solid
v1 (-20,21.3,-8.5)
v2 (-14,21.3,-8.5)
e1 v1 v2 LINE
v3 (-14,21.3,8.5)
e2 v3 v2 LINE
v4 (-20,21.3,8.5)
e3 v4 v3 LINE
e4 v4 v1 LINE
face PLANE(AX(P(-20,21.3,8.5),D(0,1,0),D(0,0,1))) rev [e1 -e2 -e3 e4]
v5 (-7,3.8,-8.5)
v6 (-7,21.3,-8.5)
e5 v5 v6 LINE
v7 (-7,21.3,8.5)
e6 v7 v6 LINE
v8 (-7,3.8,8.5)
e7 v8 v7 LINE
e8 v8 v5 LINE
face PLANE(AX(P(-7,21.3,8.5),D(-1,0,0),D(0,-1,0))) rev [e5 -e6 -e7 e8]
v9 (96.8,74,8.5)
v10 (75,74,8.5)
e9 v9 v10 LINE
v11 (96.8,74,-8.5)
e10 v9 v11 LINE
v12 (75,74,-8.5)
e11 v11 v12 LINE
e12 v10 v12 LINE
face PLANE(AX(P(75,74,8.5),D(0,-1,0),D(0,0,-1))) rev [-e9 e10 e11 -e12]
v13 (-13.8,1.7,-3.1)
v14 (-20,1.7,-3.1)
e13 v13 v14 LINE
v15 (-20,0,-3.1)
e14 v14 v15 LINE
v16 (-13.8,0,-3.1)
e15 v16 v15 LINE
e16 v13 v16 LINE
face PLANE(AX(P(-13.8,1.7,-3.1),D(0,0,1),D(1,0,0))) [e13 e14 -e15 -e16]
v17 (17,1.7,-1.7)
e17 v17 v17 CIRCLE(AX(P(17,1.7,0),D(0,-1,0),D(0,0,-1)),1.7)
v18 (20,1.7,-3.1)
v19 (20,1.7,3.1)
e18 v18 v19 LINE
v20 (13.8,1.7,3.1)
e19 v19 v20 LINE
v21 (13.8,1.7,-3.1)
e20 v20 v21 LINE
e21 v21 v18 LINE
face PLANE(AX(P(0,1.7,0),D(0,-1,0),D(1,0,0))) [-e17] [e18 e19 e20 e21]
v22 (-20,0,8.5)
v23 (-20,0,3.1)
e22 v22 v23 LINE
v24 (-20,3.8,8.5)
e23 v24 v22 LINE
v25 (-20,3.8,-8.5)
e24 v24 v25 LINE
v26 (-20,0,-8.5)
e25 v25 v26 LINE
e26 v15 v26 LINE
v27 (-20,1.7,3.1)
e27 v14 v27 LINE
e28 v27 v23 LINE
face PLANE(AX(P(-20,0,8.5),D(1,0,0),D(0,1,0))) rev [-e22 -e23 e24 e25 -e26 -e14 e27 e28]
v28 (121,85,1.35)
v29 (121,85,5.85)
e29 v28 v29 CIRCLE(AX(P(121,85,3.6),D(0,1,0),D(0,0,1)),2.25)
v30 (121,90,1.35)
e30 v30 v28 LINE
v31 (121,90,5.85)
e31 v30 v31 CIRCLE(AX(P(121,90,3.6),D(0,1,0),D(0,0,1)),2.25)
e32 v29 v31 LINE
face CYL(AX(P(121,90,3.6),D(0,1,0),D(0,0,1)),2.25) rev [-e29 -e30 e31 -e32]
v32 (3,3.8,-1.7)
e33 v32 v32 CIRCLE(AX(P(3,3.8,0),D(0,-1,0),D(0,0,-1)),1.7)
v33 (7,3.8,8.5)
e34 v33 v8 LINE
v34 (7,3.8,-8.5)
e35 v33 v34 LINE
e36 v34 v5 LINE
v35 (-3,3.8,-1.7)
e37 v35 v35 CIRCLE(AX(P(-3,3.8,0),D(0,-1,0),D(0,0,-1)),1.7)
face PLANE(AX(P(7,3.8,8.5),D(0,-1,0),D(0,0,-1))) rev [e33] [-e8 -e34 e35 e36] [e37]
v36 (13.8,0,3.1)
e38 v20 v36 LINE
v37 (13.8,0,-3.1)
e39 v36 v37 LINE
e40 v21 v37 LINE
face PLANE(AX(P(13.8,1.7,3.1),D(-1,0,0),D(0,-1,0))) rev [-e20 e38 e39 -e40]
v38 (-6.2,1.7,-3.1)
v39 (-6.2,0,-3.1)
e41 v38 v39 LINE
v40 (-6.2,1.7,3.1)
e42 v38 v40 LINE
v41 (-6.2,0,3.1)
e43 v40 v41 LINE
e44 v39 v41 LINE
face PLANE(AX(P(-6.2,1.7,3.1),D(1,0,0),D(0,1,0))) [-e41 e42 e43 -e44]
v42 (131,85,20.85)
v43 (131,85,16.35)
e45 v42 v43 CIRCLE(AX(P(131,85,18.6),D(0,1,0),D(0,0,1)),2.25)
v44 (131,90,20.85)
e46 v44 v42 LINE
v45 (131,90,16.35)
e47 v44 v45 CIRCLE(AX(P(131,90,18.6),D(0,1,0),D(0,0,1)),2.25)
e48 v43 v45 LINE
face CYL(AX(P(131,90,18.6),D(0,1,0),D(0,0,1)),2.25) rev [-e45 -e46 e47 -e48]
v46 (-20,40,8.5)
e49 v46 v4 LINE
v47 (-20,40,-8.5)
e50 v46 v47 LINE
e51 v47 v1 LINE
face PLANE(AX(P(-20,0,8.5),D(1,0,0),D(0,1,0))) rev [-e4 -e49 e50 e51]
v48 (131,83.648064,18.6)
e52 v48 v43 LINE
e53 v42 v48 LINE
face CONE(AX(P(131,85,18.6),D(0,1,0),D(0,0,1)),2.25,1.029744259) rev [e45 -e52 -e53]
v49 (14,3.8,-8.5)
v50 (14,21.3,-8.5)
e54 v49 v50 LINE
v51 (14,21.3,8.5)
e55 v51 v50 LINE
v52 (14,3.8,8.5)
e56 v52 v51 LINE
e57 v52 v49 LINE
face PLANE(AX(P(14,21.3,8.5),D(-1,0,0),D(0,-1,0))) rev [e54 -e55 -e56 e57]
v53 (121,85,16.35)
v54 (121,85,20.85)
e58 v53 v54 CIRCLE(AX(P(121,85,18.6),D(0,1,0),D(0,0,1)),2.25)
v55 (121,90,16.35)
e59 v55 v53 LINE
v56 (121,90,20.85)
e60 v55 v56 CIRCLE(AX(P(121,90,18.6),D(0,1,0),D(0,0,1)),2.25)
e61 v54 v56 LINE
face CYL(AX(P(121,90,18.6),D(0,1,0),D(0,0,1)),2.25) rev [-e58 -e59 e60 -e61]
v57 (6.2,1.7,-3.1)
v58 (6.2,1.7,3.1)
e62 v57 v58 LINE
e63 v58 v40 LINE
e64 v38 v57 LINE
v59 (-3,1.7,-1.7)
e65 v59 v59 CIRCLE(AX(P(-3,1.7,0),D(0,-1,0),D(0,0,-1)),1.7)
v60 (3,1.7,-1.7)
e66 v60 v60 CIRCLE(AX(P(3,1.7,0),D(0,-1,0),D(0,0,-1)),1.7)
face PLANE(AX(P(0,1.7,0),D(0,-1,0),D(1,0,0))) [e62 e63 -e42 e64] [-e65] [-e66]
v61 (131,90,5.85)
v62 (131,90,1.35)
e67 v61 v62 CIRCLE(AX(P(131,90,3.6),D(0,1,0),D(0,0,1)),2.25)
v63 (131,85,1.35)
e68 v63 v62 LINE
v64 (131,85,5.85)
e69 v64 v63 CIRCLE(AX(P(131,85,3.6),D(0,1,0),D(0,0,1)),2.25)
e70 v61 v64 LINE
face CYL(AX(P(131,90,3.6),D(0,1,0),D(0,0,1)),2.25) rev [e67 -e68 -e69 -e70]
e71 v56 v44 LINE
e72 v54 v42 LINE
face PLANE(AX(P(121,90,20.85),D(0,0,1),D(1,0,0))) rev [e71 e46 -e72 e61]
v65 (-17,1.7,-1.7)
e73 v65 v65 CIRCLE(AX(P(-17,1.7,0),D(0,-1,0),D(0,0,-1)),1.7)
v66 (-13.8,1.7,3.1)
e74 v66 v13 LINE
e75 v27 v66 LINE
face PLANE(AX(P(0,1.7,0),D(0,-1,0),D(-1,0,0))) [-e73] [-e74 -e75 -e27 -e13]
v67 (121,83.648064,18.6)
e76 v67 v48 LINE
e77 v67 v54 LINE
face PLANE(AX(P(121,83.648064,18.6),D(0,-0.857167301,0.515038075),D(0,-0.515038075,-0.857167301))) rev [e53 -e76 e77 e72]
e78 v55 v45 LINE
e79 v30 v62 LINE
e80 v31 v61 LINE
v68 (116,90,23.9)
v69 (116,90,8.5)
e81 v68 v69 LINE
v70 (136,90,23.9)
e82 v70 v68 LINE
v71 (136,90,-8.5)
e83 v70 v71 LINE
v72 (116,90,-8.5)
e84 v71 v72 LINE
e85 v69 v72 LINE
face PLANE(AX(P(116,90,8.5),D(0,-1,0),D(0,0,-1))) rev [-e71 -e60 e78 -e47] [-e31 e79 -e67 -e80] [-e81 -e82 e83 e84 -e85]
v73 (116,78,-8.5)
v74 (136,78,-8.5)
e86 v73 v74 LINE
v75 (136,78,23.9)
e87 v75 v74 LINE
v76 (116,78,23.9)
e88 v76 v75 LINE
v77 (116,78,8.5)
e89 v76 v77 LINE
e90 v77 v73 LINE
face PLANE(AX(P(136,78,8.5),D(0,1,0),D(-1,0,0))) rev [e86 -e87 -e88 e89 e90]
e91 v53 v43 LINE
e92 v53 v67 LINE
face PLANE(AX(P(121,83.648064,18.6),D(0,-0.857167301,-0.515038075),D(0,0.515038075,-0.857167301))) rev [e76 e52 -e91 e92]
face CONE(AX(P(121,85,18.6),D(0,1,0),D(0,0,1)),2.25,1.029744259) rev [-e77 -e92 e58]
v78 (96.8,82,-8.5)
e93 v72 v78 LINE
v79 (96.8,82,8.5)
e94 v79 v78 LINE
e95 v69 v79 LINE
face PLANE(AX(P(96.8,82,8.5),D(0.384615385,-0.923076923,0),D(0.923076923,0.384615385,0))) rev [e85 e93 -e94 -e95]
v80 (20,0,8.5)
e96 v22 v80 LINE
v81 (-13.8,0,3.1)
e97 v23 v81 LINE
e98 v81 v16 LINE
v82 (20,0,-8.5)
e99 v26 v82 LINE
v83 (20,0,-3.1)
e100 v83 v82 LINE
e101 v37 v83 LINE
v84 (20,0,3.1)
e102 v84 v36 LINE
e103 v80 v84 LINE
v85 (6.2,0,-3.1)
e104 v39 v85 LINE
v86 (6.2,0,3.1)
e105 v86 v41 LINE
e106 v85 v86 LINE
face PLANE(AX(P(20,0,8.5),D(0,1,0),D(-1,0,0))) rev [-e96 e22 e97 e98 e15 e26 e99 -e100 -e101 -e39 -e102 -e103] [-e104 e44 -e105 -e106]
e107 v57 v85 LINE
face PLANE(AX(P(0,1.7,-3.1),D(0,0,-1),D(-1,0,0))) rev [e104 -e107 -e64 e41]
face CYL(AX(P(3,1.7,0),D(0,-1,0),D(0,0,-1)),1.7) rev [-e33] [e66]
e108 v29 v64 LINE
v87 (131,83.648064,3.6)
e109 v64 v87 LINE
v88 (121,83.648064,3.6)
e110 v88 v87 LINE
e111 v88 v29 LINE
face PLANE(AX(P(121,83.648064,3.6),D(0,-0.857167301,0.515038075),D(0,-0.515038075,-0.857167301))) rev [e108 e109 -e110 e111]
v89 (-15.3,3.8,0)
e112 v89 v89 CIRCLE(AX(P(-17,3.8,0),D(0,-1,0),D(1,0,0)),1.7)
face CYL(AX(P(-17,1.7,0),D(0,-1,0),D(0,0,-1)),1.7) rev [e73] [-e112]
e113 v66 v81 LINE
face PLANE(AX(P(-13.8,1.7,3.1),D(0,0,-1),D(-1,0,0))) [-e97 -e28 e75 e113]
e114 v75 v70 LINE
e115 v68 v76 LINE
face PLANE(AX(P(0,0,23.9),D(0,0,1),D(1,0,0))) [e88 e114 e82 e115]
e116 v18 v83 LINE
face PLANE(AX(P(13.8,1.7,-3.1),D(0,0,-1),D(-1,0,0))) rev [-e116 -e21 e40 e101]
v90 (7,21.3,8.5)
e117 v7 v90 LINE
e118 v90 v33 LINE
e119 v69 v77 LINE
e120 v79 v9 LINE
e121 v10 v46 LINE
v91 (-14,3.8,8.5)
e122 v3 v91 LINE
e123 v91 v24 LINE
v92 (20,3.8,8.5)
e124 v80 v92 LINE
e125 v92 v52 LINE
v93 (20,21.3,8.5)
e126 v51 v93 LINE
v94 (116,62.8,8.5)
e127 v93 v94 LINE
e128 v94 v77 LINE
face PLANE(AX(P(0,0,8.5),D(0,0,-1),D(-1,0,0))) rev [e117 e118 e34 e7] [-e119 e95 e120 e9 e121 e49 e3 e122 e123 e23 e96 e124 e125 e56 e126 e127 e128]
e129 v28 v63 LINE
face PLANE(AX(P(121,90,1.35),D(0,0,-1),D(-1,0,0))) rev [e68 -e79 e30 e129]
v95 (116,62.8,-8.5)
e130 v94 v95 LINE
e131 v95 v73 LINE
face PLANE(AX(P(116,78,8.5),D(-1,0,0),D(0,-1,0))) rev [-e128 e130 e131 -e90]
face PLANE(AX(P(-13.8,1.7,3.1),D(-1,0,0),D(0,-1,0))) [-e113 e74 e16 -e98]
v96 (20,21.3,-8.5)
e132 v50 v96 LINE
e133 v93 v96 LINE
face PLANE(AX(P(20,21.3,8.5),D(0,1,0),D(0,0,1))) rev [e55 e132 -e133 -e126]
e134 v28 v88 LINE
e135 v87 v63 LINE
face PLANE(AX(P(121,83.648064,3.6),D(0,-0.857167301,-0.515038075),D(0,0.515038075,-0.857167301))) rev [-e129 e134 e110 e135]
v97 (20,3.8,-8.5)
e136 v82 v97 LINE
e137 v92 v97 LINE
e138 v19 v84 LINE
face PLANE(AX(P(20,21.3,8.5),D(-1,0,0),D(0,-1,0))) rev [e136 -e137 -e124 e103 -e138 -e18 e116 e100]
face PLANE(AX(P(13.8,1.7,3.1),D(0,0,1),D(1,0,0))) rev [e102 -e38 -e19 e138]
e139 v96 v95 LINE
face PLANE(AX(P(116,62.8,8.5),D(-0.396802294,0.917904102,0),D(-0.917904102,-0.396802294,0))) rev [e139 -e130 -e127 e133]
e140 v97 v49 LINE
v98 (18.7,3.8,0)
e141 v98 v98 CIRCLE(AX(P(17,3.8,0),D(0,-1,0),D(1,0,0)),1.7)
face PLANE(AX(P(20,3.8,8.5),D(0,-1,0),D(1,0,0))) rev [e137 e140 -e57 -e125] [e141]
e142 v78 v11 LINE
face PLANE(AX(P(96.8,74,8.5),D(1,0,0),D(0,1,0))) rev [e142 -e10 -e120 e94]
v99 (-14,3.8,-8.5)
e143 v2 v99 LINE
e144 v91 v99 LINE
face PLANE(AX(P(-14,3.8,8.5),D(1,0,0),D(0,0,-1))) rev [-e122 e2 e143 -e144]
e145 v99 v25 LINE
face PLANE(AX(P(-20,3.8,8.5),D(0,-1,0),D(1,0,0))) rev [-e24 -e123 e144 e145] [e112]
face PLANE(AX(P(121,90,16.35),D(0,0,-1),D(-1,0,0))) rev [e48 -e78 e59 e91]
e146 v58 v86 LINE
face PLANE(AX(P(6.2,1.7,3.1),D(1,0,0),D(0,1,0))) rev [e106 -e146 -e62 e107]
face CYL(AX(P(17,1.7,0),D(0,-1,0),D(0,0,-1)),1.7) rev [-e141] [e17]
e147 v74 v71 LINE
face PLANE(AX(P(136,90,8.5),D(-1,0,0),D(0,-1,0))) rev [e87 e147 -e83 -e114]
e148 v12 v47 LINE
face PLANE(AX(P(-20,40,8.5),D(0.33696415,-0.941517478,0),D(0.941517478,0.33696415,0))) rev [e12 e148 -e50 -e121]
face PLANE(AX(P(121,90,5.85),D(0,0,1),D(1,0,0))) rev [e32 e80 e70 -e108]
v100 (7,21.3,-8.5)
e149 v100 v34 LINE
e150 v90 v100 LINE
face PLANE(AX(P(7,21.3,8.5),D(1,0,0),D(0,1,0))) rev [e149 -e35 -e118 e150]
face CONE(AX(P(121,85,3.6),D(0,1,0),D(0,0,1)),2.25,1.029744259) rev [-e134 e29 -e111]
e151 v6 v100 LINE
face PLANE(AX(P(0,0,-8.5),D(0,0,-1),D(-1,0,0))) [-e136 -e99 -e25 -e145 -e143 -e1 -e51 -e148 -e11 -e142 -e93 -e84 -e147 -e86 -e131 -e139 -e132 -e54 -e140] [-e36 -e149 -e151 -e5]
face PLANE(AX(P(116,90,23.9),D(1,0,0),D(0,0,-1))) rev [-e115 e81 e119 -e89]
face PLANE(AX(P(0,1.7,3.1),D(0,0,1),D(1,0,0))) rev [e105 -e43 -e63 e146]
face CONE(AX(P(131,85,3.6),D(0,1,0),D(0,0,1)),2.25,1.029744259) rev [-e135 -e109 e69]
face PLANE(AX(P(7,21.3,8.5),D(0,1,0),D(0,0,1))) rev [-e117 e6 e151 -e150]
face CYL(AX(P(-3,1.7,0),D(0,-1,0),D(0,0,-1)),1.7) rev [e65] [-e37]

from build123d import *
from build123d.topology import SkipClean

# Parameters (mm, degrees)
EXTRUDE_1_DEPTH          = 8.5
SKETCH_2_W               = 6.2
SKETCH_2_H               = 6.2
CUT_EXTRUDE_1_DEPTH      = 1.7
SKETCH_3_W               = 6
SKETCH_3_H               = 17.5
SKETCH_3_W_2             = 14
CUT_EXTRUDE_2_DEPTH      = 164.966459985
HOLE_WIZARD_M3_1_D       = 3.4
HOLE_WIZARD_M3_1_DEPTH   = 5
HOLE_WIZARD_M3_1_TIP     = 1.021463052
SKETCH_6_W               = 20
SKETCH_6_H               = 12
EXTRUDE_2_DEPTH          = 15.4
HOLE_START               = 85
HOLE_WIZARD_M4_1_DEPTH   = 5
HOLE_START_2             = 121
HOLE_WIZARD_M4_1_2_DEPTH = 10


with BuildPart() as part:
    # 스케치1 → 보스-돌출1 (new, symmetric)
    with BuildSketch(Plane.XY):
        Polygon((20, 0), (-20, 0), (-20, 40), (75, 74), (96.8, 74), (96.8, 82), (116, 90), (136, 90), (136, 78), (116, 78), (116, 62.8), (20, 21.3), align=None)
    extrude(amount=EXTRUDE_1_DEPTH, both=True)

    # 스케치2 → 컷-돌출1 (cut)
    with BuildSketch(Plane(origin=(0, 0, 0), x_dir=(-1, 0, 0), z_dir=(0, -1, 0))):
        with Locations((-3.1, 0)):
            Rectangle(SKETCH_2_W, SKETCH_2_H)
        with Locations((-16.9, 0)):
            Rectangle(SKETCH_2_W, SKETCH_2_H)
    cut_extrude_1 = extrude(amount=-CUT_EXTRUDE_1_DEPTH, mode=Mode.SUBTRACT)

    # 대칭 복사1: 컷-돌출1 across plane
    add(cut_extrude_1.mirror(Plane(origin=(0, 0, 0), x_dir=(0, 0, 1), z_dir=(1, 0, 0))), mode=Mode.SUBTRACT)

    # 스케치3 → 컷-돌출2 (cut, through all)
    with BuildSketch(Plane(origin=(0, 0, -8.5), x_dir=(-1, 0, 0), z_dir=(0, 0, -1))):
        with Locations((-17, 12.55)):
            Rectangle(SKETCH_3_W, SKETCH_3_H)
        with Locations((0, 12.55)):
            Rectangle(SKETCH_3_W_2, SKETCH_3_H)
        with Locations((17, 12.55)):
            Rectangle(SKETCH_3_W, SKETCH_3_H)
    extrude(amount=-CUT_EXTRUDE_2_DEPTH, mode=Mode.SUBTRACT)

    # M3 여유 구멍1
    with Locations(Plane(origin=(0, 1.7, 0), x_dir=(-1, 0, 0), z_dir=(0, -1, 0))):
        with Locations((17, 0), (3, 0), (-3, 0), (-17, 0)):
            Hole(HOLE_WIZARD_M3_1_D / 2, depth=HOLE_WIZARD_M3_1_DEPTH)
            with Locations((0, 0, -(HOLE_WIZARD_M3_1_DEPTH + HOLE_WIZARD_M3_1_TIP / 2))):  # 118° drill point
                Cone(0, HOLE_WIZARD_M3_1_D / 2, HOLE_WIZARD_M3_1_TIP, mode=Mode.SUBTRACT)

    # 스케치6 → 보스-돌출2 (add)
    with BuildSketch(Plane.XY.offset(8.5)):
        with Locations((126, 84)):
            Rectangle(SKETCH_6_W, SKETCH_6_H)
    extrude(amount=EXTRUDE_2_DEPTH)

    # M4 여유 홈1: read off the stored shape, not the designer's step
    # M4 여유 홈1 outline → M4 여유 홈1 (cut)
    with BuildSketch(Plane(origin=(0, 0, 0), x_dir=(1, 0, 0), z_dir=(0, 1, 0)).offset(HOLE_START)):
        with BuildLine():
            Line((121, -5.85), (131, -5.85))
            ThreePointArc((131, -5.85), (133.25, -3.6), (131, -1.35))
            Line((131, -1.35), (121, -1.35))
            ThreePointArc((121, -1.35), (118.75, -3.6), (121, -5.85))
        make_face()
        with BuildLine():
            Line((121, -20.85), (131, -20.85))
            ThreePointArc((131, -20.85), (133.25, -18.6), (131, -16.35))
            Line((131, -16.35), (121, -16.35))
            ThreePointArc((121, -16.35), (118.75, -18.6), (121, -20.85))
        make_face()
    extrude(amount=HOLE_WIZARD_M4_1_DEPTH, mode=Mode.SUBTRACT)

    # Hole Wizard M4 _ _1 2 outline → Hole Wizard M4 _ _1 2 (cut)
    with BuildSketch(Plane.YZ.offset(HOLE_START_2)):
        Polygon((85, 5.85), (83.648063607, 3.6), (85, 1.35), align=None)
        Polygon((85, 20.85), (83.648063607, 18.6), (85, 16.35), align=None)
    extrude(amount=HOLE_WIZARD_M4_1_2_DEPTH, mode=Mode.SUBTRACT)

    # Hole Wizard M4 _ _1 3 outline → Hole Wizard M4 _ _1 3 (revolve, cut)
    with SkipClean():  # the faces are left unmerged after this step: merging them gives an invalid solid
        with BuildSketch(Plane(origin=(131, 0, 3.6), x_dir=(1, 0, 0), z_dir=(0, 0, 1))):
            Polygon((0, 85), (0, 83.648063607), (2.25, 85), align=None)
        revolve(axis=Axis((131, 0, 3.6), (0, 1, 0)), mode=Mode.SUBTRACT)

    # Hole Wizard M4 _ _1 4 outline → Hole Wizard M4 _ _1 4 (revolve, cut)
    with SkipClean():  # the faces are left unmerged after this step: merging them gives an invalid solid
        with BuildSketch(Plane(origin=(121, 0, 3.6), x_dir=(1, 0, 0), z_dir=(0, 0, 1))):
            Polygon((0, 85), (0, 83.648063607), (2.25, 85), align=None)
        revolve(axis=Axis((121, 0, 3.6), (0, 1, 0)), mode=Mode.SUBTRACT)

    # Hole Wizard M4 _ _1 5 outline → Hole Wizard M4 _ _1 5 (revolve, cut)
    with SkipClean():  # the faces are left unmerged after this step: merging them gives an invalid solid
        with BuildSketch(Plane(origin=(131, 0, 18.6), x_dir=(1, 0, 0), z_dir=(0, 0, 1))):
            Polygon((0, 85), (0, 83.648063607), (2.25, 85), align=None)
        revolve(axis=Axis((131, 0, 18.6), (0, 1, 0)), mode=Mode.SUBTRACT)

    # Hole Wizard M4 _ _1 6 outline → Hole Wizard M4 _ _1 6 (revolve, cut)
    with SkipClean():  # the faces are left unmerged after this step: merging them gives an invalid solid
        with BuildSketch(Plane(origin=(121, 0, 18.6), x_dir=(1, 0, 0), z_dir=(0, 0, 1))):
            Polygon((0, 85), (0, 83.648063607), (2.25, 85), align=None)
        revolve(axis=Axis((121, 0, 18.6), (0, 1, 0)), mode=Mode.SUBTRACT)


solid = part.part
